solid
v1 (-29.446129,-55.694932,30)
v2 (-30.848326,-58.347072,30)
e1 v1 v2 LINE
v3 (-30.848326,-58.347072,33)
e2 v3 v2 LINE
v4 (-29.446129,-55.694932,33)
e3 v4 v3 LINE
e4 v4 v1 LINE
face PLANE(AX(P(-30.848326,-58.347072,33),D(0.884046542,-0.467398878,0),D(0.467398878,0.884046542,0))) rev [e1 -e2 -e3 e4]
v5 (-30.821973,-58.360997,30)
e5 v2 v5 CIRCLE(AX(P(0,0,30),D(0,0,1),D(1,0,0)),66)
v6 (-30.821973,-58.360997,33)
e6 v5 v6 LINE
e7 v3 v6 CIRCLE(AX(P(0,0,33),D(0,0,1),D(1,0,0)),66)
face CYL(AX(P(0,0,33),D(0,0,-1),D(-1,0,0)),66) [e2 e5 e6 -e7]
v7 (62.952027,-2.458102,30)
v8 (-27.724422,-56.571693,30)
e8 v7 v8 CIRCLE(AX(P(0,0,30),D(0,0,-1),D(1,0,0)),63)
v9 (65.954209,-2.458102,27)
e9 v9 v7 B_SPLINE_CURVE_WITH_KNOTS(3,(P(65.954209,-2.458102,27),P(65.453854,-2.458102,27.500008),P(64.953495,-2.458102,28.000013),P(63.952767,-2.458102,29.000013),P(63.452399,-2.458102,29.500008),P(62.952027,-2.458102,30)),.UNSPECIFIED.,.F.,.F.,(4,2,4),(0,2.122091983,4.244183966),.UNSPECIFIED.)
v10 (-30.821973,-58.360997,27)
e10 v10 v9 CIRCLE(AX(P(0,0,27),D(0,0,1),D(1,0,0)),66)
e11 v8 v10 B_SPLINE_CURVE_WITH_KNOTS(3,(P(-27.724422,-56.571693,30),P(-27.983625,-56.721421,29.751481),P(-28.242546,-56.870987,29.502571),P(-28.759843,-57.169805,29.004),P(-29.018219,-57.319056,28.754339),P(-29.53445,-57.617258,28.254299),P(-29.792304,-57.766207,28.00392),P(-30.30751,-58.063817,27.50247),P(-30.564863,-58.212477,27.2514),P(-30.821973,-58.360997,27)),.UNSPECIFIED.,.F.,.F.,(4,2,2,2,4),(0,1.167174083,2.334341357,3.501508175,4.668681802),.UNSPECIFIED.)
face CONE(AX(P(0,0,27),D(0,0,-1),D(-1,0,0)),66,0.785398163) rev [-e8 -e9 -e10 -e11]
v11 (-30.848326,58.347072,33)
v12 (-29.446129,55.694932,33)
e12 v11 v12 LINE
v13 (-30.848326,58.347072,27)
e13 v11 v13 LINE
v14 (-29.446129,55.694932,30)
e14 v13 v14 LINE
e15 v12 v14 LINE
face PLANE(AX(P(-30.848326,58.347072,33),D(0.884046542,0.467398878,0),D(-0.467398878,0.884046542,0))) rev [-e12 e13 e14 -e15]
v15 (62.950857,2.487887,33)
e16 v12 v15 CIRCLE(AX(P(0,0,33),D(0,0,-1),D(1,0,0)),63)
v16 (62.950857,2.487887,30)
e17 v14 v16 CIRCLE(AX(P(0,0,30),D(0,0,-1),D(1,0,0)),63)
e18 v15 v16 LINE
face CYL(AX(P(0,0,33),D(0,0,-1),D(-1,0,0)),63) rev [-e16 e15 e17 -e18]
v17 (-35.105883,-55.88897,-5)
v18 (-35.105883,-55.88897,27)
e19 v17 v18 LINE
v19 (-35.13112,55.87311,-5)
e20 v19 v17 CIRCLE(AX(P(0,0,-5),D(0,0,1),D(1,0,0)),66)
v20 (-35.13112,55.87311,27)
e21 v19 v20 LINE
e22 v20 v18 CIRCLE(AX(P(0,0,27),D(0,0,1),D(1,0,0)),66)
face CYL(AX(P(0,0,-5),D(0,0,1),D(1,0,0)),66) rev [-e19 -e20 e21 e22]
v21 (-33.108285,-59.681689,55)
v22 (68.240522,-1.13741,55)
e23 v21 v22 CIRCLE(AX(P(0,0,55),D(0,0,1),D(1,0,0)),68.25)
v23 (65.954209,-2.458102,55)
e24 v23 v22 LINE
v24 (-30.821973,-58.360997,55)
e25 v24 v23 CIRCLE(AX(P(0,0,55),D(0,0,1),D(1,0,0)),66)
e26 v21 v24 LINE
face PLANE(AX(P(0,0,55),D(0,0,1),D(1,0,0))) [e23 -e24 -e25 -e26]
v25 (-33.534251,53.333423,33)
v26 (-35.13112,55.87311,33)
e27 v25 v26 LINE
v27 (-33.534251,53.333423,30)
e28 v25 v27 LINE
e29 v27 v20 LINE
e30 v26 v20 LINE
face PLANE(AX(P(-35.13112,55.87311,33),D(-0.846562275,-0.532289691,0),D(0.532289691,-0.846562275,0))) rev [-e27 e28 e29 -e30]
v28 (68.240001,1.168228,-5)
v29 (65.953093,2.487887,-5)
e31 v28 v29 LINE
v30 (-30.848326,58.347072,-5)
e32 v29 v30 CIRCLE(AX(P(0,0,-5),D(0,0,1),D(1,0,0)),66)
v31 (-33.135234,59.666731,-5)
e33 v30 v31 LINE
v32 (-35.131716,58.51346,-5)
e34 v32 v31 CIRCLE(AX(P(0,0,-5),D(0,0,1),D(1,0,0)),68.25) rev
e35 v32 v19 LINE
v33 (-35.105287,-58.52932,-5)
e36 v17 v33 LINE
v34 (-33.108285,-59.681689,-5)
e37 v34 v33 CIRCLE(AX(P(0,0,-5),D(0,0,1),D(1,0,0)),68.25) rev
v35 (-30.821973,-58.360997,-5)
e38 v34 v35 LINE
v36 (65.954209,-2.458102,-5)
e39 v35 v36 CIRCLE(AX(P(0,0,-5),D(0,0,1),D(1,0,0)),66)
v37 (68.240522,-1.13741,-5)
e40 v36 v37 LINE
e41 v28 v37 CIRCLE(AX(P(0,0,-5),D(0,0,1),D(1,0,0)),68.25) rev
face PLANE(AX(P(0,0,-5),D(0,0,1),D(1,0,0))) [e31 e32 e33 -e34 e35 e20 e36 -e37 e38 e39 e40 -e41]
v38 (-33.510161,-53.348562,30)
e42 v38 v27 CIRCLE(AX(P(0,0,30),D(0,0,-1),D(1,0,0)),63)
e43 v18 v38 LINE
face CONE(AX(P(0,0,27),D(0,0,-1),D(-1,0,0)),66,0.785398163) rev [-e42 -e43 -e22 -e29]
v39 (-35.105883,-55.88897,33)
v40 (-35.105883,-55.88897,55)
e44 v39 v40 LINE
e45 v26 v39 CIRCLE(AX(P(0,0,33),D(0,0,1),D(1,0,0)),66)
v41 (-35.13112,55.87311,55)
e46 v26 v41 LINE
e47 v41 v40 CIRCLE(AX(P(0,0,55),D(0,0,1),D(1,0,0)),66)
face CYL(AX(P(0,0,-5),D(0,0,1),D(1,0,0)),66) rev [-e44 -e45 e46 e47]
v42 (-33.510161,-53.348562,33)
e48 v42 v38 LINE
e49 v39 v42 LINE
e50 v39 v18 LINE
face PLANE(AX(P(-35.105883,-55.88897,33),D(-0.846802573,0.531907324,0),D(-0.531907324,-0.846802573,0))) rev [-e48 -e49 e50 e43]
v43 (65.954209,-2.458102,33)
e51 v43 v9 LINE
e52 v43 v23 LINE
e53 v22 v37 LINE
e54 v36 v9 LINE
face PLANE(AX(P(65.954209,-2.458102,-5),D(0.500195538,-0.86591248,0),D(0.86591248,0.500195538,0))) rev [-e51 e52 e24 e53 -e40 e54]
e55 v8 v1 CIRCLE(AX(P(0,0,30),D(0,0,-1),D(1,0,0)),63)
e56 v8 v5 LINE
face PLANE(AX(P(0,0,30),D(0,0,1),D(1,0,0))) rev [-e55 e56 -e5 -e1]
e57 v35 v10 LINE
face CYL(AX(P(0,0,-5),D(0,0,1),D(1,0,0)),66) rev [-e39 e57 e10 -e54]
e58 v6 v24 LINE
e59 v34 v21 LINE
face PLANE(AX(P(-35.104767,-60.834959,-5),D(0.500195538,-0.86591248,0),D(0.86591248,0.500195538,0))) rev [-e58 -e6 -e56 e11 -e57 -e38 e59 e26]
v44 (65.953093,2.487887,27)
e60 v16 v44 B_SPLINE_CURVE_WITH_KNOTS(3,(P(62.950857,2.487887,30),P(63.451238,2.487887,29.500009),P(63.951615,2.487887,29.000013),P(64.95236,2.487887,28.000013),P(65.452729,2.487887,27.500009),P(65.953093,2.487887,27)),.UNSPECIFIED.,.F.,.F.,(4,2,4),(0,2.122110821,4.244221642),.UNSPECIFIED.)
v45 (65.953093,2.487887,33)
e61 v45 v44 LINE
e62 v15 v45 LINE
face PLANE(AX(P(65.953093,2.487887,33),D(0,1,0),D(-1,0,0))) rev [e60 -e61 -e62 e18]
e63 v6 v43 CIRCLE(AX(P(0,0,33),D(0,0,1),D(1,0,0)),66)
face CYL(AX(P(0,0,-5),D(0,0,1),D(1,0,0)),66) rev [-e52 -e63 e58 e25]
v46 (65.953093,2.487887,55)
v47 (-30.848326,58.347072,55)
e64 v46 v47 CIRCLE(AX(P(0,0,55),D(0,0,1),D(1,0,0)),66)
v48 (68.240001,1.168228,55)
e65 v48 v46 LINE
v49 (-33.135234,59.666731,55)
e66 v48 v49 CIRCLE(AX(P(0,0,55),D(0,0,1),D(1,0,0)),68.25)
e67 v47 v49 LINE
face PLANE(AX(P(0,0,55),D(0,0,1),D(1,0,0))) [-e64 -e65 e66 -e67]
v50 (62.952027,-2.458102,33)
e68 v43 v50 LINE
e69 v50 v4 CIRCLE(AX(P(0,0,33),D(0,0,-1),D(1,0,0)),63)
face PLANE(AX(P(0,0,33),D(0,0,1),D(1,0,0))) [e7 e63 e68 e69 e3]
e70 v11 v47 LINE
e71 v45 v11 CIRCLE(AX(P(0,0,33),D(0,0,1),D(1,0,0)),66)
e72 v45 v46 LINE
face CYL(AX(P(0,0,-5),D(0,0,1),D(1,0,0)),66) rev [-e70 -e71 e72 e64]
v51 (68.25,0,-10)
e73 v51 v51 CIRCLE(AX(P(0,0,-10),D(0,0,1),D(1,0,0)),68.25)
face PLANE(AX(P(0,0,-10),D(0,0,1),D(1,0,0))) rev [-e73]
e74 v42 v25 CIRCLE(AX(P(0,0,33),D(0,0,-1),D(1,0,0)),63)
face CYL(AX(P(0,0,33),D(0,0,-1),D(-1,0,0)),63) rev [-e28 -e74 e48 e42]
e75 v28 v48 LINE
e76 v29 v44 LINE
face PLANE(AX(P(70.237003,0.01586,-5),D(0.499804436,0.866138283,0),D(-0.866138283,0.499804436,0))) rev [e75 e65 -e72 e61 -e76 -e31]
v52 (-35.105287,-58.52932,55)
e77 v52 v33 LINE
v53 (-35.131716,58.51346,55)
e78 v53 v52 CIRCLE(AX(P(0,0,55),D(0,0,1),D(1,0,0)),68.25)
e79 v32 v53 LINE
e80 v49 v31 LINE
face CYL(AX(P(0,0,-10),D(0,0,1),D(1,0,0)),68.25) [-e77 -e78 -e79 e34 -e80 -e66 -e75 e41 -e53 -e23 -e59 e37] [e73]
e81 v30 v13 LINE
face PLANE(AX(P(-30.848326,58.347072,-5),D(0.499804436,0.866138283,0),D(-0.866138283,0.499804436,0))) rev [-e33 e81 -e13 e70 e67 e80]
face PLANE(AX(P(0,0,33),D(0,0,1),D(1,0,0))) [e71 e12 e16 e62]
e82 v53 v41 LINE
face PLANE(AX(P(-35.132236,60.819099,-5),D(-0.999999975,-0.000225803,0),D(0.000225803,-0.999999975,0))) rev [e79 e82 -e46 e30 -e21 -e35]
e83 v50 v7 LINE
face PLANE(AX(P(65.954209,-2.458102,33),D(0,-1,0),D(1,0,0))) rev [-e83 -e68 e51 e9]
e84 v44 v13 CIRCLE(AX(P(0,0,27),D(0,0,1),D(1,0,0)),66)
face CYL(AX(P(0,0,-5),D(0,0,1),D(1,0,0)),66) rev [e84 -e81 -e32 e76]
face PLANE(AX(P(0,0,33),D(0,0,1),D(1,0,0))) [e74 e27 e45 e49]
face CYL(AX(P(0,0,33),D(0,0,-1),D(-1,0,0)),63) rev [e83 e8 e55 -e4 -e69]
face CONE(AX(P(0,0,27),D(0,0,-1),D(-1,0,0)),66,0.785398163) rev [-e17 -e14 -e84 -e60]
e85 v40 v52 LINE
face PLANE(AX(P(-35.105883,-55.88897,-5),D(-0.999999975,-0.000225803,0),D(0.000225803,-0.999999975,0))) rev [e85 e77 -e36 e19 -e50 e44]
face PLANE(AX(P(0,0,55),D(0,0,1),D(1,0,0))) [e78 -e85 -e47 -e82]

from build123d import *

# Parameters (mm, degrees)
BOSS_EXTRUDE2_DEPTH      = 55
BOSS_EXTRUDE2_DEPTH_BACK = 10
SKETCH1_R                = 68.25
CUT_EXTRUDE1_DEPTH       = 60
BOSS_EXTRUDE3_START      = 3
BOSS_EXTRUDE3_DEPTH      = 3
FILLET1_SIZE             = 3


with BuildPart() as part:
    # Sketch1 → Boss-Extrude2 (new, two sides: drawn at the far end of the back side and taken through both)
    with BuildSketch(Plane.XY.offset(-BOSS_EXTRUDE2_DEPTH_BACK)):
        Circle(SKETCH1_R)
    extrude(amount=BOSS_EXTRUDE2_DEPTH + BOSS_EXTRUDE2_DEPTH_BACK)

    # Sketch3 → Cut-Extrude1 (cut)
    with BuildSketch(Plane.XY.offset(55)):
        with BuildLine():
            Line((-30.84832597, 58.347071776), (-35.132236429, 60.819099042))
            Line((-35.132236429, 60.819099042), (-35.13111961, 55.873110124))
            ThreePointArc((-35.13111961, 55.873110124), (-65.999998317, -0.01490299), (-35.105883409, -55.888969842))
            Line((-35.105883409, -55.888969842), (-35.104766591, -60.83495876))
            Line((-35.104766591, -60.83495876), (-30.821972951, -58.360997108))
            ThreePointArc((-30.821972951, -58.360997108), (33.012905527, -57.150223697), (65.95420938, -2.458101934))
            Line((65.95420938, -2.458101934), (70.23700302, 0.015859718))
            Line((70.23700302, 0.015859718), (65.953092561, 2.487886984))
            ThreePointArc((65.953092561, 2.487886984), (32.98709279, 57.165126688), (-30.84832597, 58.347071776))
        make_face()
    extrude(amount=-CUT_EXTRUDE1_DEPTH, mode=Mode.SUBTRACT)

    # Sketch4 → Boss-Extrude3 (add)
    with BuildSketch(Plane.XY.offset(30).offset(BOSS_EXTRUDE3_START)):
        with BuildLine():
            Line((-35.13111961, 55.873110124), (-33.534250537, 53.3334233))
            ThreePointArc((-33.534250537, 53.3334233), (-62.999998394, -0.014225582), (-33.510161436, -53.348562122))
            Line((-33.510161436, -53.348562122), (-35.105883409, -55.888969842))
            ThreePointArc((-35.105883409, -55.888969842), (-65.999998317, -0.01490299), (-35.13111961, 55.873110124))
        make_face()
        with BuildLine():
            Line((-30.84832597, 58.347071776), (-29.446129335, 55.69493215))
            ThreePointArc((-29.446129335, 55.69493215), (31.438656311, 54.594971283), (62.950857169, 2.487886984))
            Line((62.950857169, 2.487886984), (65.953092561, 2.487886984))
            ThreePointArc((65.953092561, 2.487886984), (32.98709279, 57.165126688), (-30.84832597, 58.347071776))
        make_face()
        with BuildLine():
            Line((65.95420938, -2.458101934), (62.95202725, -2.458101934))
            ThreePointArc((62.95202725, -2.458101934), (31.451571052, -54.587532261), (-29.446129335, -55.69493215))
            Line((-29.446129335, -55.69493215), (-30.84832597, -58.347071776))
            ThreePointArc((-30.84832597, -58.347071776), (33, -57.15767665), (65.95420938, -2.458101934))
        make_face()
    extrude(amount=-BOSS_EXTRUDE3_DEPTH)

    # Fillet1
    fillet1_edges = [part.edges().sort_by_distance(p)[0] for p in [
        (33.012905527, -57.150223697, 30),
        (32.98709279, 57.165126688, 30),
        (-65.999998317, -0.01490299, 30),
    ]]
    chamfer(fillet1_edges, length=FILLET1_SIZE - 0.0001)  # a hair under: the kernel refuses the full size


solid = part.part
